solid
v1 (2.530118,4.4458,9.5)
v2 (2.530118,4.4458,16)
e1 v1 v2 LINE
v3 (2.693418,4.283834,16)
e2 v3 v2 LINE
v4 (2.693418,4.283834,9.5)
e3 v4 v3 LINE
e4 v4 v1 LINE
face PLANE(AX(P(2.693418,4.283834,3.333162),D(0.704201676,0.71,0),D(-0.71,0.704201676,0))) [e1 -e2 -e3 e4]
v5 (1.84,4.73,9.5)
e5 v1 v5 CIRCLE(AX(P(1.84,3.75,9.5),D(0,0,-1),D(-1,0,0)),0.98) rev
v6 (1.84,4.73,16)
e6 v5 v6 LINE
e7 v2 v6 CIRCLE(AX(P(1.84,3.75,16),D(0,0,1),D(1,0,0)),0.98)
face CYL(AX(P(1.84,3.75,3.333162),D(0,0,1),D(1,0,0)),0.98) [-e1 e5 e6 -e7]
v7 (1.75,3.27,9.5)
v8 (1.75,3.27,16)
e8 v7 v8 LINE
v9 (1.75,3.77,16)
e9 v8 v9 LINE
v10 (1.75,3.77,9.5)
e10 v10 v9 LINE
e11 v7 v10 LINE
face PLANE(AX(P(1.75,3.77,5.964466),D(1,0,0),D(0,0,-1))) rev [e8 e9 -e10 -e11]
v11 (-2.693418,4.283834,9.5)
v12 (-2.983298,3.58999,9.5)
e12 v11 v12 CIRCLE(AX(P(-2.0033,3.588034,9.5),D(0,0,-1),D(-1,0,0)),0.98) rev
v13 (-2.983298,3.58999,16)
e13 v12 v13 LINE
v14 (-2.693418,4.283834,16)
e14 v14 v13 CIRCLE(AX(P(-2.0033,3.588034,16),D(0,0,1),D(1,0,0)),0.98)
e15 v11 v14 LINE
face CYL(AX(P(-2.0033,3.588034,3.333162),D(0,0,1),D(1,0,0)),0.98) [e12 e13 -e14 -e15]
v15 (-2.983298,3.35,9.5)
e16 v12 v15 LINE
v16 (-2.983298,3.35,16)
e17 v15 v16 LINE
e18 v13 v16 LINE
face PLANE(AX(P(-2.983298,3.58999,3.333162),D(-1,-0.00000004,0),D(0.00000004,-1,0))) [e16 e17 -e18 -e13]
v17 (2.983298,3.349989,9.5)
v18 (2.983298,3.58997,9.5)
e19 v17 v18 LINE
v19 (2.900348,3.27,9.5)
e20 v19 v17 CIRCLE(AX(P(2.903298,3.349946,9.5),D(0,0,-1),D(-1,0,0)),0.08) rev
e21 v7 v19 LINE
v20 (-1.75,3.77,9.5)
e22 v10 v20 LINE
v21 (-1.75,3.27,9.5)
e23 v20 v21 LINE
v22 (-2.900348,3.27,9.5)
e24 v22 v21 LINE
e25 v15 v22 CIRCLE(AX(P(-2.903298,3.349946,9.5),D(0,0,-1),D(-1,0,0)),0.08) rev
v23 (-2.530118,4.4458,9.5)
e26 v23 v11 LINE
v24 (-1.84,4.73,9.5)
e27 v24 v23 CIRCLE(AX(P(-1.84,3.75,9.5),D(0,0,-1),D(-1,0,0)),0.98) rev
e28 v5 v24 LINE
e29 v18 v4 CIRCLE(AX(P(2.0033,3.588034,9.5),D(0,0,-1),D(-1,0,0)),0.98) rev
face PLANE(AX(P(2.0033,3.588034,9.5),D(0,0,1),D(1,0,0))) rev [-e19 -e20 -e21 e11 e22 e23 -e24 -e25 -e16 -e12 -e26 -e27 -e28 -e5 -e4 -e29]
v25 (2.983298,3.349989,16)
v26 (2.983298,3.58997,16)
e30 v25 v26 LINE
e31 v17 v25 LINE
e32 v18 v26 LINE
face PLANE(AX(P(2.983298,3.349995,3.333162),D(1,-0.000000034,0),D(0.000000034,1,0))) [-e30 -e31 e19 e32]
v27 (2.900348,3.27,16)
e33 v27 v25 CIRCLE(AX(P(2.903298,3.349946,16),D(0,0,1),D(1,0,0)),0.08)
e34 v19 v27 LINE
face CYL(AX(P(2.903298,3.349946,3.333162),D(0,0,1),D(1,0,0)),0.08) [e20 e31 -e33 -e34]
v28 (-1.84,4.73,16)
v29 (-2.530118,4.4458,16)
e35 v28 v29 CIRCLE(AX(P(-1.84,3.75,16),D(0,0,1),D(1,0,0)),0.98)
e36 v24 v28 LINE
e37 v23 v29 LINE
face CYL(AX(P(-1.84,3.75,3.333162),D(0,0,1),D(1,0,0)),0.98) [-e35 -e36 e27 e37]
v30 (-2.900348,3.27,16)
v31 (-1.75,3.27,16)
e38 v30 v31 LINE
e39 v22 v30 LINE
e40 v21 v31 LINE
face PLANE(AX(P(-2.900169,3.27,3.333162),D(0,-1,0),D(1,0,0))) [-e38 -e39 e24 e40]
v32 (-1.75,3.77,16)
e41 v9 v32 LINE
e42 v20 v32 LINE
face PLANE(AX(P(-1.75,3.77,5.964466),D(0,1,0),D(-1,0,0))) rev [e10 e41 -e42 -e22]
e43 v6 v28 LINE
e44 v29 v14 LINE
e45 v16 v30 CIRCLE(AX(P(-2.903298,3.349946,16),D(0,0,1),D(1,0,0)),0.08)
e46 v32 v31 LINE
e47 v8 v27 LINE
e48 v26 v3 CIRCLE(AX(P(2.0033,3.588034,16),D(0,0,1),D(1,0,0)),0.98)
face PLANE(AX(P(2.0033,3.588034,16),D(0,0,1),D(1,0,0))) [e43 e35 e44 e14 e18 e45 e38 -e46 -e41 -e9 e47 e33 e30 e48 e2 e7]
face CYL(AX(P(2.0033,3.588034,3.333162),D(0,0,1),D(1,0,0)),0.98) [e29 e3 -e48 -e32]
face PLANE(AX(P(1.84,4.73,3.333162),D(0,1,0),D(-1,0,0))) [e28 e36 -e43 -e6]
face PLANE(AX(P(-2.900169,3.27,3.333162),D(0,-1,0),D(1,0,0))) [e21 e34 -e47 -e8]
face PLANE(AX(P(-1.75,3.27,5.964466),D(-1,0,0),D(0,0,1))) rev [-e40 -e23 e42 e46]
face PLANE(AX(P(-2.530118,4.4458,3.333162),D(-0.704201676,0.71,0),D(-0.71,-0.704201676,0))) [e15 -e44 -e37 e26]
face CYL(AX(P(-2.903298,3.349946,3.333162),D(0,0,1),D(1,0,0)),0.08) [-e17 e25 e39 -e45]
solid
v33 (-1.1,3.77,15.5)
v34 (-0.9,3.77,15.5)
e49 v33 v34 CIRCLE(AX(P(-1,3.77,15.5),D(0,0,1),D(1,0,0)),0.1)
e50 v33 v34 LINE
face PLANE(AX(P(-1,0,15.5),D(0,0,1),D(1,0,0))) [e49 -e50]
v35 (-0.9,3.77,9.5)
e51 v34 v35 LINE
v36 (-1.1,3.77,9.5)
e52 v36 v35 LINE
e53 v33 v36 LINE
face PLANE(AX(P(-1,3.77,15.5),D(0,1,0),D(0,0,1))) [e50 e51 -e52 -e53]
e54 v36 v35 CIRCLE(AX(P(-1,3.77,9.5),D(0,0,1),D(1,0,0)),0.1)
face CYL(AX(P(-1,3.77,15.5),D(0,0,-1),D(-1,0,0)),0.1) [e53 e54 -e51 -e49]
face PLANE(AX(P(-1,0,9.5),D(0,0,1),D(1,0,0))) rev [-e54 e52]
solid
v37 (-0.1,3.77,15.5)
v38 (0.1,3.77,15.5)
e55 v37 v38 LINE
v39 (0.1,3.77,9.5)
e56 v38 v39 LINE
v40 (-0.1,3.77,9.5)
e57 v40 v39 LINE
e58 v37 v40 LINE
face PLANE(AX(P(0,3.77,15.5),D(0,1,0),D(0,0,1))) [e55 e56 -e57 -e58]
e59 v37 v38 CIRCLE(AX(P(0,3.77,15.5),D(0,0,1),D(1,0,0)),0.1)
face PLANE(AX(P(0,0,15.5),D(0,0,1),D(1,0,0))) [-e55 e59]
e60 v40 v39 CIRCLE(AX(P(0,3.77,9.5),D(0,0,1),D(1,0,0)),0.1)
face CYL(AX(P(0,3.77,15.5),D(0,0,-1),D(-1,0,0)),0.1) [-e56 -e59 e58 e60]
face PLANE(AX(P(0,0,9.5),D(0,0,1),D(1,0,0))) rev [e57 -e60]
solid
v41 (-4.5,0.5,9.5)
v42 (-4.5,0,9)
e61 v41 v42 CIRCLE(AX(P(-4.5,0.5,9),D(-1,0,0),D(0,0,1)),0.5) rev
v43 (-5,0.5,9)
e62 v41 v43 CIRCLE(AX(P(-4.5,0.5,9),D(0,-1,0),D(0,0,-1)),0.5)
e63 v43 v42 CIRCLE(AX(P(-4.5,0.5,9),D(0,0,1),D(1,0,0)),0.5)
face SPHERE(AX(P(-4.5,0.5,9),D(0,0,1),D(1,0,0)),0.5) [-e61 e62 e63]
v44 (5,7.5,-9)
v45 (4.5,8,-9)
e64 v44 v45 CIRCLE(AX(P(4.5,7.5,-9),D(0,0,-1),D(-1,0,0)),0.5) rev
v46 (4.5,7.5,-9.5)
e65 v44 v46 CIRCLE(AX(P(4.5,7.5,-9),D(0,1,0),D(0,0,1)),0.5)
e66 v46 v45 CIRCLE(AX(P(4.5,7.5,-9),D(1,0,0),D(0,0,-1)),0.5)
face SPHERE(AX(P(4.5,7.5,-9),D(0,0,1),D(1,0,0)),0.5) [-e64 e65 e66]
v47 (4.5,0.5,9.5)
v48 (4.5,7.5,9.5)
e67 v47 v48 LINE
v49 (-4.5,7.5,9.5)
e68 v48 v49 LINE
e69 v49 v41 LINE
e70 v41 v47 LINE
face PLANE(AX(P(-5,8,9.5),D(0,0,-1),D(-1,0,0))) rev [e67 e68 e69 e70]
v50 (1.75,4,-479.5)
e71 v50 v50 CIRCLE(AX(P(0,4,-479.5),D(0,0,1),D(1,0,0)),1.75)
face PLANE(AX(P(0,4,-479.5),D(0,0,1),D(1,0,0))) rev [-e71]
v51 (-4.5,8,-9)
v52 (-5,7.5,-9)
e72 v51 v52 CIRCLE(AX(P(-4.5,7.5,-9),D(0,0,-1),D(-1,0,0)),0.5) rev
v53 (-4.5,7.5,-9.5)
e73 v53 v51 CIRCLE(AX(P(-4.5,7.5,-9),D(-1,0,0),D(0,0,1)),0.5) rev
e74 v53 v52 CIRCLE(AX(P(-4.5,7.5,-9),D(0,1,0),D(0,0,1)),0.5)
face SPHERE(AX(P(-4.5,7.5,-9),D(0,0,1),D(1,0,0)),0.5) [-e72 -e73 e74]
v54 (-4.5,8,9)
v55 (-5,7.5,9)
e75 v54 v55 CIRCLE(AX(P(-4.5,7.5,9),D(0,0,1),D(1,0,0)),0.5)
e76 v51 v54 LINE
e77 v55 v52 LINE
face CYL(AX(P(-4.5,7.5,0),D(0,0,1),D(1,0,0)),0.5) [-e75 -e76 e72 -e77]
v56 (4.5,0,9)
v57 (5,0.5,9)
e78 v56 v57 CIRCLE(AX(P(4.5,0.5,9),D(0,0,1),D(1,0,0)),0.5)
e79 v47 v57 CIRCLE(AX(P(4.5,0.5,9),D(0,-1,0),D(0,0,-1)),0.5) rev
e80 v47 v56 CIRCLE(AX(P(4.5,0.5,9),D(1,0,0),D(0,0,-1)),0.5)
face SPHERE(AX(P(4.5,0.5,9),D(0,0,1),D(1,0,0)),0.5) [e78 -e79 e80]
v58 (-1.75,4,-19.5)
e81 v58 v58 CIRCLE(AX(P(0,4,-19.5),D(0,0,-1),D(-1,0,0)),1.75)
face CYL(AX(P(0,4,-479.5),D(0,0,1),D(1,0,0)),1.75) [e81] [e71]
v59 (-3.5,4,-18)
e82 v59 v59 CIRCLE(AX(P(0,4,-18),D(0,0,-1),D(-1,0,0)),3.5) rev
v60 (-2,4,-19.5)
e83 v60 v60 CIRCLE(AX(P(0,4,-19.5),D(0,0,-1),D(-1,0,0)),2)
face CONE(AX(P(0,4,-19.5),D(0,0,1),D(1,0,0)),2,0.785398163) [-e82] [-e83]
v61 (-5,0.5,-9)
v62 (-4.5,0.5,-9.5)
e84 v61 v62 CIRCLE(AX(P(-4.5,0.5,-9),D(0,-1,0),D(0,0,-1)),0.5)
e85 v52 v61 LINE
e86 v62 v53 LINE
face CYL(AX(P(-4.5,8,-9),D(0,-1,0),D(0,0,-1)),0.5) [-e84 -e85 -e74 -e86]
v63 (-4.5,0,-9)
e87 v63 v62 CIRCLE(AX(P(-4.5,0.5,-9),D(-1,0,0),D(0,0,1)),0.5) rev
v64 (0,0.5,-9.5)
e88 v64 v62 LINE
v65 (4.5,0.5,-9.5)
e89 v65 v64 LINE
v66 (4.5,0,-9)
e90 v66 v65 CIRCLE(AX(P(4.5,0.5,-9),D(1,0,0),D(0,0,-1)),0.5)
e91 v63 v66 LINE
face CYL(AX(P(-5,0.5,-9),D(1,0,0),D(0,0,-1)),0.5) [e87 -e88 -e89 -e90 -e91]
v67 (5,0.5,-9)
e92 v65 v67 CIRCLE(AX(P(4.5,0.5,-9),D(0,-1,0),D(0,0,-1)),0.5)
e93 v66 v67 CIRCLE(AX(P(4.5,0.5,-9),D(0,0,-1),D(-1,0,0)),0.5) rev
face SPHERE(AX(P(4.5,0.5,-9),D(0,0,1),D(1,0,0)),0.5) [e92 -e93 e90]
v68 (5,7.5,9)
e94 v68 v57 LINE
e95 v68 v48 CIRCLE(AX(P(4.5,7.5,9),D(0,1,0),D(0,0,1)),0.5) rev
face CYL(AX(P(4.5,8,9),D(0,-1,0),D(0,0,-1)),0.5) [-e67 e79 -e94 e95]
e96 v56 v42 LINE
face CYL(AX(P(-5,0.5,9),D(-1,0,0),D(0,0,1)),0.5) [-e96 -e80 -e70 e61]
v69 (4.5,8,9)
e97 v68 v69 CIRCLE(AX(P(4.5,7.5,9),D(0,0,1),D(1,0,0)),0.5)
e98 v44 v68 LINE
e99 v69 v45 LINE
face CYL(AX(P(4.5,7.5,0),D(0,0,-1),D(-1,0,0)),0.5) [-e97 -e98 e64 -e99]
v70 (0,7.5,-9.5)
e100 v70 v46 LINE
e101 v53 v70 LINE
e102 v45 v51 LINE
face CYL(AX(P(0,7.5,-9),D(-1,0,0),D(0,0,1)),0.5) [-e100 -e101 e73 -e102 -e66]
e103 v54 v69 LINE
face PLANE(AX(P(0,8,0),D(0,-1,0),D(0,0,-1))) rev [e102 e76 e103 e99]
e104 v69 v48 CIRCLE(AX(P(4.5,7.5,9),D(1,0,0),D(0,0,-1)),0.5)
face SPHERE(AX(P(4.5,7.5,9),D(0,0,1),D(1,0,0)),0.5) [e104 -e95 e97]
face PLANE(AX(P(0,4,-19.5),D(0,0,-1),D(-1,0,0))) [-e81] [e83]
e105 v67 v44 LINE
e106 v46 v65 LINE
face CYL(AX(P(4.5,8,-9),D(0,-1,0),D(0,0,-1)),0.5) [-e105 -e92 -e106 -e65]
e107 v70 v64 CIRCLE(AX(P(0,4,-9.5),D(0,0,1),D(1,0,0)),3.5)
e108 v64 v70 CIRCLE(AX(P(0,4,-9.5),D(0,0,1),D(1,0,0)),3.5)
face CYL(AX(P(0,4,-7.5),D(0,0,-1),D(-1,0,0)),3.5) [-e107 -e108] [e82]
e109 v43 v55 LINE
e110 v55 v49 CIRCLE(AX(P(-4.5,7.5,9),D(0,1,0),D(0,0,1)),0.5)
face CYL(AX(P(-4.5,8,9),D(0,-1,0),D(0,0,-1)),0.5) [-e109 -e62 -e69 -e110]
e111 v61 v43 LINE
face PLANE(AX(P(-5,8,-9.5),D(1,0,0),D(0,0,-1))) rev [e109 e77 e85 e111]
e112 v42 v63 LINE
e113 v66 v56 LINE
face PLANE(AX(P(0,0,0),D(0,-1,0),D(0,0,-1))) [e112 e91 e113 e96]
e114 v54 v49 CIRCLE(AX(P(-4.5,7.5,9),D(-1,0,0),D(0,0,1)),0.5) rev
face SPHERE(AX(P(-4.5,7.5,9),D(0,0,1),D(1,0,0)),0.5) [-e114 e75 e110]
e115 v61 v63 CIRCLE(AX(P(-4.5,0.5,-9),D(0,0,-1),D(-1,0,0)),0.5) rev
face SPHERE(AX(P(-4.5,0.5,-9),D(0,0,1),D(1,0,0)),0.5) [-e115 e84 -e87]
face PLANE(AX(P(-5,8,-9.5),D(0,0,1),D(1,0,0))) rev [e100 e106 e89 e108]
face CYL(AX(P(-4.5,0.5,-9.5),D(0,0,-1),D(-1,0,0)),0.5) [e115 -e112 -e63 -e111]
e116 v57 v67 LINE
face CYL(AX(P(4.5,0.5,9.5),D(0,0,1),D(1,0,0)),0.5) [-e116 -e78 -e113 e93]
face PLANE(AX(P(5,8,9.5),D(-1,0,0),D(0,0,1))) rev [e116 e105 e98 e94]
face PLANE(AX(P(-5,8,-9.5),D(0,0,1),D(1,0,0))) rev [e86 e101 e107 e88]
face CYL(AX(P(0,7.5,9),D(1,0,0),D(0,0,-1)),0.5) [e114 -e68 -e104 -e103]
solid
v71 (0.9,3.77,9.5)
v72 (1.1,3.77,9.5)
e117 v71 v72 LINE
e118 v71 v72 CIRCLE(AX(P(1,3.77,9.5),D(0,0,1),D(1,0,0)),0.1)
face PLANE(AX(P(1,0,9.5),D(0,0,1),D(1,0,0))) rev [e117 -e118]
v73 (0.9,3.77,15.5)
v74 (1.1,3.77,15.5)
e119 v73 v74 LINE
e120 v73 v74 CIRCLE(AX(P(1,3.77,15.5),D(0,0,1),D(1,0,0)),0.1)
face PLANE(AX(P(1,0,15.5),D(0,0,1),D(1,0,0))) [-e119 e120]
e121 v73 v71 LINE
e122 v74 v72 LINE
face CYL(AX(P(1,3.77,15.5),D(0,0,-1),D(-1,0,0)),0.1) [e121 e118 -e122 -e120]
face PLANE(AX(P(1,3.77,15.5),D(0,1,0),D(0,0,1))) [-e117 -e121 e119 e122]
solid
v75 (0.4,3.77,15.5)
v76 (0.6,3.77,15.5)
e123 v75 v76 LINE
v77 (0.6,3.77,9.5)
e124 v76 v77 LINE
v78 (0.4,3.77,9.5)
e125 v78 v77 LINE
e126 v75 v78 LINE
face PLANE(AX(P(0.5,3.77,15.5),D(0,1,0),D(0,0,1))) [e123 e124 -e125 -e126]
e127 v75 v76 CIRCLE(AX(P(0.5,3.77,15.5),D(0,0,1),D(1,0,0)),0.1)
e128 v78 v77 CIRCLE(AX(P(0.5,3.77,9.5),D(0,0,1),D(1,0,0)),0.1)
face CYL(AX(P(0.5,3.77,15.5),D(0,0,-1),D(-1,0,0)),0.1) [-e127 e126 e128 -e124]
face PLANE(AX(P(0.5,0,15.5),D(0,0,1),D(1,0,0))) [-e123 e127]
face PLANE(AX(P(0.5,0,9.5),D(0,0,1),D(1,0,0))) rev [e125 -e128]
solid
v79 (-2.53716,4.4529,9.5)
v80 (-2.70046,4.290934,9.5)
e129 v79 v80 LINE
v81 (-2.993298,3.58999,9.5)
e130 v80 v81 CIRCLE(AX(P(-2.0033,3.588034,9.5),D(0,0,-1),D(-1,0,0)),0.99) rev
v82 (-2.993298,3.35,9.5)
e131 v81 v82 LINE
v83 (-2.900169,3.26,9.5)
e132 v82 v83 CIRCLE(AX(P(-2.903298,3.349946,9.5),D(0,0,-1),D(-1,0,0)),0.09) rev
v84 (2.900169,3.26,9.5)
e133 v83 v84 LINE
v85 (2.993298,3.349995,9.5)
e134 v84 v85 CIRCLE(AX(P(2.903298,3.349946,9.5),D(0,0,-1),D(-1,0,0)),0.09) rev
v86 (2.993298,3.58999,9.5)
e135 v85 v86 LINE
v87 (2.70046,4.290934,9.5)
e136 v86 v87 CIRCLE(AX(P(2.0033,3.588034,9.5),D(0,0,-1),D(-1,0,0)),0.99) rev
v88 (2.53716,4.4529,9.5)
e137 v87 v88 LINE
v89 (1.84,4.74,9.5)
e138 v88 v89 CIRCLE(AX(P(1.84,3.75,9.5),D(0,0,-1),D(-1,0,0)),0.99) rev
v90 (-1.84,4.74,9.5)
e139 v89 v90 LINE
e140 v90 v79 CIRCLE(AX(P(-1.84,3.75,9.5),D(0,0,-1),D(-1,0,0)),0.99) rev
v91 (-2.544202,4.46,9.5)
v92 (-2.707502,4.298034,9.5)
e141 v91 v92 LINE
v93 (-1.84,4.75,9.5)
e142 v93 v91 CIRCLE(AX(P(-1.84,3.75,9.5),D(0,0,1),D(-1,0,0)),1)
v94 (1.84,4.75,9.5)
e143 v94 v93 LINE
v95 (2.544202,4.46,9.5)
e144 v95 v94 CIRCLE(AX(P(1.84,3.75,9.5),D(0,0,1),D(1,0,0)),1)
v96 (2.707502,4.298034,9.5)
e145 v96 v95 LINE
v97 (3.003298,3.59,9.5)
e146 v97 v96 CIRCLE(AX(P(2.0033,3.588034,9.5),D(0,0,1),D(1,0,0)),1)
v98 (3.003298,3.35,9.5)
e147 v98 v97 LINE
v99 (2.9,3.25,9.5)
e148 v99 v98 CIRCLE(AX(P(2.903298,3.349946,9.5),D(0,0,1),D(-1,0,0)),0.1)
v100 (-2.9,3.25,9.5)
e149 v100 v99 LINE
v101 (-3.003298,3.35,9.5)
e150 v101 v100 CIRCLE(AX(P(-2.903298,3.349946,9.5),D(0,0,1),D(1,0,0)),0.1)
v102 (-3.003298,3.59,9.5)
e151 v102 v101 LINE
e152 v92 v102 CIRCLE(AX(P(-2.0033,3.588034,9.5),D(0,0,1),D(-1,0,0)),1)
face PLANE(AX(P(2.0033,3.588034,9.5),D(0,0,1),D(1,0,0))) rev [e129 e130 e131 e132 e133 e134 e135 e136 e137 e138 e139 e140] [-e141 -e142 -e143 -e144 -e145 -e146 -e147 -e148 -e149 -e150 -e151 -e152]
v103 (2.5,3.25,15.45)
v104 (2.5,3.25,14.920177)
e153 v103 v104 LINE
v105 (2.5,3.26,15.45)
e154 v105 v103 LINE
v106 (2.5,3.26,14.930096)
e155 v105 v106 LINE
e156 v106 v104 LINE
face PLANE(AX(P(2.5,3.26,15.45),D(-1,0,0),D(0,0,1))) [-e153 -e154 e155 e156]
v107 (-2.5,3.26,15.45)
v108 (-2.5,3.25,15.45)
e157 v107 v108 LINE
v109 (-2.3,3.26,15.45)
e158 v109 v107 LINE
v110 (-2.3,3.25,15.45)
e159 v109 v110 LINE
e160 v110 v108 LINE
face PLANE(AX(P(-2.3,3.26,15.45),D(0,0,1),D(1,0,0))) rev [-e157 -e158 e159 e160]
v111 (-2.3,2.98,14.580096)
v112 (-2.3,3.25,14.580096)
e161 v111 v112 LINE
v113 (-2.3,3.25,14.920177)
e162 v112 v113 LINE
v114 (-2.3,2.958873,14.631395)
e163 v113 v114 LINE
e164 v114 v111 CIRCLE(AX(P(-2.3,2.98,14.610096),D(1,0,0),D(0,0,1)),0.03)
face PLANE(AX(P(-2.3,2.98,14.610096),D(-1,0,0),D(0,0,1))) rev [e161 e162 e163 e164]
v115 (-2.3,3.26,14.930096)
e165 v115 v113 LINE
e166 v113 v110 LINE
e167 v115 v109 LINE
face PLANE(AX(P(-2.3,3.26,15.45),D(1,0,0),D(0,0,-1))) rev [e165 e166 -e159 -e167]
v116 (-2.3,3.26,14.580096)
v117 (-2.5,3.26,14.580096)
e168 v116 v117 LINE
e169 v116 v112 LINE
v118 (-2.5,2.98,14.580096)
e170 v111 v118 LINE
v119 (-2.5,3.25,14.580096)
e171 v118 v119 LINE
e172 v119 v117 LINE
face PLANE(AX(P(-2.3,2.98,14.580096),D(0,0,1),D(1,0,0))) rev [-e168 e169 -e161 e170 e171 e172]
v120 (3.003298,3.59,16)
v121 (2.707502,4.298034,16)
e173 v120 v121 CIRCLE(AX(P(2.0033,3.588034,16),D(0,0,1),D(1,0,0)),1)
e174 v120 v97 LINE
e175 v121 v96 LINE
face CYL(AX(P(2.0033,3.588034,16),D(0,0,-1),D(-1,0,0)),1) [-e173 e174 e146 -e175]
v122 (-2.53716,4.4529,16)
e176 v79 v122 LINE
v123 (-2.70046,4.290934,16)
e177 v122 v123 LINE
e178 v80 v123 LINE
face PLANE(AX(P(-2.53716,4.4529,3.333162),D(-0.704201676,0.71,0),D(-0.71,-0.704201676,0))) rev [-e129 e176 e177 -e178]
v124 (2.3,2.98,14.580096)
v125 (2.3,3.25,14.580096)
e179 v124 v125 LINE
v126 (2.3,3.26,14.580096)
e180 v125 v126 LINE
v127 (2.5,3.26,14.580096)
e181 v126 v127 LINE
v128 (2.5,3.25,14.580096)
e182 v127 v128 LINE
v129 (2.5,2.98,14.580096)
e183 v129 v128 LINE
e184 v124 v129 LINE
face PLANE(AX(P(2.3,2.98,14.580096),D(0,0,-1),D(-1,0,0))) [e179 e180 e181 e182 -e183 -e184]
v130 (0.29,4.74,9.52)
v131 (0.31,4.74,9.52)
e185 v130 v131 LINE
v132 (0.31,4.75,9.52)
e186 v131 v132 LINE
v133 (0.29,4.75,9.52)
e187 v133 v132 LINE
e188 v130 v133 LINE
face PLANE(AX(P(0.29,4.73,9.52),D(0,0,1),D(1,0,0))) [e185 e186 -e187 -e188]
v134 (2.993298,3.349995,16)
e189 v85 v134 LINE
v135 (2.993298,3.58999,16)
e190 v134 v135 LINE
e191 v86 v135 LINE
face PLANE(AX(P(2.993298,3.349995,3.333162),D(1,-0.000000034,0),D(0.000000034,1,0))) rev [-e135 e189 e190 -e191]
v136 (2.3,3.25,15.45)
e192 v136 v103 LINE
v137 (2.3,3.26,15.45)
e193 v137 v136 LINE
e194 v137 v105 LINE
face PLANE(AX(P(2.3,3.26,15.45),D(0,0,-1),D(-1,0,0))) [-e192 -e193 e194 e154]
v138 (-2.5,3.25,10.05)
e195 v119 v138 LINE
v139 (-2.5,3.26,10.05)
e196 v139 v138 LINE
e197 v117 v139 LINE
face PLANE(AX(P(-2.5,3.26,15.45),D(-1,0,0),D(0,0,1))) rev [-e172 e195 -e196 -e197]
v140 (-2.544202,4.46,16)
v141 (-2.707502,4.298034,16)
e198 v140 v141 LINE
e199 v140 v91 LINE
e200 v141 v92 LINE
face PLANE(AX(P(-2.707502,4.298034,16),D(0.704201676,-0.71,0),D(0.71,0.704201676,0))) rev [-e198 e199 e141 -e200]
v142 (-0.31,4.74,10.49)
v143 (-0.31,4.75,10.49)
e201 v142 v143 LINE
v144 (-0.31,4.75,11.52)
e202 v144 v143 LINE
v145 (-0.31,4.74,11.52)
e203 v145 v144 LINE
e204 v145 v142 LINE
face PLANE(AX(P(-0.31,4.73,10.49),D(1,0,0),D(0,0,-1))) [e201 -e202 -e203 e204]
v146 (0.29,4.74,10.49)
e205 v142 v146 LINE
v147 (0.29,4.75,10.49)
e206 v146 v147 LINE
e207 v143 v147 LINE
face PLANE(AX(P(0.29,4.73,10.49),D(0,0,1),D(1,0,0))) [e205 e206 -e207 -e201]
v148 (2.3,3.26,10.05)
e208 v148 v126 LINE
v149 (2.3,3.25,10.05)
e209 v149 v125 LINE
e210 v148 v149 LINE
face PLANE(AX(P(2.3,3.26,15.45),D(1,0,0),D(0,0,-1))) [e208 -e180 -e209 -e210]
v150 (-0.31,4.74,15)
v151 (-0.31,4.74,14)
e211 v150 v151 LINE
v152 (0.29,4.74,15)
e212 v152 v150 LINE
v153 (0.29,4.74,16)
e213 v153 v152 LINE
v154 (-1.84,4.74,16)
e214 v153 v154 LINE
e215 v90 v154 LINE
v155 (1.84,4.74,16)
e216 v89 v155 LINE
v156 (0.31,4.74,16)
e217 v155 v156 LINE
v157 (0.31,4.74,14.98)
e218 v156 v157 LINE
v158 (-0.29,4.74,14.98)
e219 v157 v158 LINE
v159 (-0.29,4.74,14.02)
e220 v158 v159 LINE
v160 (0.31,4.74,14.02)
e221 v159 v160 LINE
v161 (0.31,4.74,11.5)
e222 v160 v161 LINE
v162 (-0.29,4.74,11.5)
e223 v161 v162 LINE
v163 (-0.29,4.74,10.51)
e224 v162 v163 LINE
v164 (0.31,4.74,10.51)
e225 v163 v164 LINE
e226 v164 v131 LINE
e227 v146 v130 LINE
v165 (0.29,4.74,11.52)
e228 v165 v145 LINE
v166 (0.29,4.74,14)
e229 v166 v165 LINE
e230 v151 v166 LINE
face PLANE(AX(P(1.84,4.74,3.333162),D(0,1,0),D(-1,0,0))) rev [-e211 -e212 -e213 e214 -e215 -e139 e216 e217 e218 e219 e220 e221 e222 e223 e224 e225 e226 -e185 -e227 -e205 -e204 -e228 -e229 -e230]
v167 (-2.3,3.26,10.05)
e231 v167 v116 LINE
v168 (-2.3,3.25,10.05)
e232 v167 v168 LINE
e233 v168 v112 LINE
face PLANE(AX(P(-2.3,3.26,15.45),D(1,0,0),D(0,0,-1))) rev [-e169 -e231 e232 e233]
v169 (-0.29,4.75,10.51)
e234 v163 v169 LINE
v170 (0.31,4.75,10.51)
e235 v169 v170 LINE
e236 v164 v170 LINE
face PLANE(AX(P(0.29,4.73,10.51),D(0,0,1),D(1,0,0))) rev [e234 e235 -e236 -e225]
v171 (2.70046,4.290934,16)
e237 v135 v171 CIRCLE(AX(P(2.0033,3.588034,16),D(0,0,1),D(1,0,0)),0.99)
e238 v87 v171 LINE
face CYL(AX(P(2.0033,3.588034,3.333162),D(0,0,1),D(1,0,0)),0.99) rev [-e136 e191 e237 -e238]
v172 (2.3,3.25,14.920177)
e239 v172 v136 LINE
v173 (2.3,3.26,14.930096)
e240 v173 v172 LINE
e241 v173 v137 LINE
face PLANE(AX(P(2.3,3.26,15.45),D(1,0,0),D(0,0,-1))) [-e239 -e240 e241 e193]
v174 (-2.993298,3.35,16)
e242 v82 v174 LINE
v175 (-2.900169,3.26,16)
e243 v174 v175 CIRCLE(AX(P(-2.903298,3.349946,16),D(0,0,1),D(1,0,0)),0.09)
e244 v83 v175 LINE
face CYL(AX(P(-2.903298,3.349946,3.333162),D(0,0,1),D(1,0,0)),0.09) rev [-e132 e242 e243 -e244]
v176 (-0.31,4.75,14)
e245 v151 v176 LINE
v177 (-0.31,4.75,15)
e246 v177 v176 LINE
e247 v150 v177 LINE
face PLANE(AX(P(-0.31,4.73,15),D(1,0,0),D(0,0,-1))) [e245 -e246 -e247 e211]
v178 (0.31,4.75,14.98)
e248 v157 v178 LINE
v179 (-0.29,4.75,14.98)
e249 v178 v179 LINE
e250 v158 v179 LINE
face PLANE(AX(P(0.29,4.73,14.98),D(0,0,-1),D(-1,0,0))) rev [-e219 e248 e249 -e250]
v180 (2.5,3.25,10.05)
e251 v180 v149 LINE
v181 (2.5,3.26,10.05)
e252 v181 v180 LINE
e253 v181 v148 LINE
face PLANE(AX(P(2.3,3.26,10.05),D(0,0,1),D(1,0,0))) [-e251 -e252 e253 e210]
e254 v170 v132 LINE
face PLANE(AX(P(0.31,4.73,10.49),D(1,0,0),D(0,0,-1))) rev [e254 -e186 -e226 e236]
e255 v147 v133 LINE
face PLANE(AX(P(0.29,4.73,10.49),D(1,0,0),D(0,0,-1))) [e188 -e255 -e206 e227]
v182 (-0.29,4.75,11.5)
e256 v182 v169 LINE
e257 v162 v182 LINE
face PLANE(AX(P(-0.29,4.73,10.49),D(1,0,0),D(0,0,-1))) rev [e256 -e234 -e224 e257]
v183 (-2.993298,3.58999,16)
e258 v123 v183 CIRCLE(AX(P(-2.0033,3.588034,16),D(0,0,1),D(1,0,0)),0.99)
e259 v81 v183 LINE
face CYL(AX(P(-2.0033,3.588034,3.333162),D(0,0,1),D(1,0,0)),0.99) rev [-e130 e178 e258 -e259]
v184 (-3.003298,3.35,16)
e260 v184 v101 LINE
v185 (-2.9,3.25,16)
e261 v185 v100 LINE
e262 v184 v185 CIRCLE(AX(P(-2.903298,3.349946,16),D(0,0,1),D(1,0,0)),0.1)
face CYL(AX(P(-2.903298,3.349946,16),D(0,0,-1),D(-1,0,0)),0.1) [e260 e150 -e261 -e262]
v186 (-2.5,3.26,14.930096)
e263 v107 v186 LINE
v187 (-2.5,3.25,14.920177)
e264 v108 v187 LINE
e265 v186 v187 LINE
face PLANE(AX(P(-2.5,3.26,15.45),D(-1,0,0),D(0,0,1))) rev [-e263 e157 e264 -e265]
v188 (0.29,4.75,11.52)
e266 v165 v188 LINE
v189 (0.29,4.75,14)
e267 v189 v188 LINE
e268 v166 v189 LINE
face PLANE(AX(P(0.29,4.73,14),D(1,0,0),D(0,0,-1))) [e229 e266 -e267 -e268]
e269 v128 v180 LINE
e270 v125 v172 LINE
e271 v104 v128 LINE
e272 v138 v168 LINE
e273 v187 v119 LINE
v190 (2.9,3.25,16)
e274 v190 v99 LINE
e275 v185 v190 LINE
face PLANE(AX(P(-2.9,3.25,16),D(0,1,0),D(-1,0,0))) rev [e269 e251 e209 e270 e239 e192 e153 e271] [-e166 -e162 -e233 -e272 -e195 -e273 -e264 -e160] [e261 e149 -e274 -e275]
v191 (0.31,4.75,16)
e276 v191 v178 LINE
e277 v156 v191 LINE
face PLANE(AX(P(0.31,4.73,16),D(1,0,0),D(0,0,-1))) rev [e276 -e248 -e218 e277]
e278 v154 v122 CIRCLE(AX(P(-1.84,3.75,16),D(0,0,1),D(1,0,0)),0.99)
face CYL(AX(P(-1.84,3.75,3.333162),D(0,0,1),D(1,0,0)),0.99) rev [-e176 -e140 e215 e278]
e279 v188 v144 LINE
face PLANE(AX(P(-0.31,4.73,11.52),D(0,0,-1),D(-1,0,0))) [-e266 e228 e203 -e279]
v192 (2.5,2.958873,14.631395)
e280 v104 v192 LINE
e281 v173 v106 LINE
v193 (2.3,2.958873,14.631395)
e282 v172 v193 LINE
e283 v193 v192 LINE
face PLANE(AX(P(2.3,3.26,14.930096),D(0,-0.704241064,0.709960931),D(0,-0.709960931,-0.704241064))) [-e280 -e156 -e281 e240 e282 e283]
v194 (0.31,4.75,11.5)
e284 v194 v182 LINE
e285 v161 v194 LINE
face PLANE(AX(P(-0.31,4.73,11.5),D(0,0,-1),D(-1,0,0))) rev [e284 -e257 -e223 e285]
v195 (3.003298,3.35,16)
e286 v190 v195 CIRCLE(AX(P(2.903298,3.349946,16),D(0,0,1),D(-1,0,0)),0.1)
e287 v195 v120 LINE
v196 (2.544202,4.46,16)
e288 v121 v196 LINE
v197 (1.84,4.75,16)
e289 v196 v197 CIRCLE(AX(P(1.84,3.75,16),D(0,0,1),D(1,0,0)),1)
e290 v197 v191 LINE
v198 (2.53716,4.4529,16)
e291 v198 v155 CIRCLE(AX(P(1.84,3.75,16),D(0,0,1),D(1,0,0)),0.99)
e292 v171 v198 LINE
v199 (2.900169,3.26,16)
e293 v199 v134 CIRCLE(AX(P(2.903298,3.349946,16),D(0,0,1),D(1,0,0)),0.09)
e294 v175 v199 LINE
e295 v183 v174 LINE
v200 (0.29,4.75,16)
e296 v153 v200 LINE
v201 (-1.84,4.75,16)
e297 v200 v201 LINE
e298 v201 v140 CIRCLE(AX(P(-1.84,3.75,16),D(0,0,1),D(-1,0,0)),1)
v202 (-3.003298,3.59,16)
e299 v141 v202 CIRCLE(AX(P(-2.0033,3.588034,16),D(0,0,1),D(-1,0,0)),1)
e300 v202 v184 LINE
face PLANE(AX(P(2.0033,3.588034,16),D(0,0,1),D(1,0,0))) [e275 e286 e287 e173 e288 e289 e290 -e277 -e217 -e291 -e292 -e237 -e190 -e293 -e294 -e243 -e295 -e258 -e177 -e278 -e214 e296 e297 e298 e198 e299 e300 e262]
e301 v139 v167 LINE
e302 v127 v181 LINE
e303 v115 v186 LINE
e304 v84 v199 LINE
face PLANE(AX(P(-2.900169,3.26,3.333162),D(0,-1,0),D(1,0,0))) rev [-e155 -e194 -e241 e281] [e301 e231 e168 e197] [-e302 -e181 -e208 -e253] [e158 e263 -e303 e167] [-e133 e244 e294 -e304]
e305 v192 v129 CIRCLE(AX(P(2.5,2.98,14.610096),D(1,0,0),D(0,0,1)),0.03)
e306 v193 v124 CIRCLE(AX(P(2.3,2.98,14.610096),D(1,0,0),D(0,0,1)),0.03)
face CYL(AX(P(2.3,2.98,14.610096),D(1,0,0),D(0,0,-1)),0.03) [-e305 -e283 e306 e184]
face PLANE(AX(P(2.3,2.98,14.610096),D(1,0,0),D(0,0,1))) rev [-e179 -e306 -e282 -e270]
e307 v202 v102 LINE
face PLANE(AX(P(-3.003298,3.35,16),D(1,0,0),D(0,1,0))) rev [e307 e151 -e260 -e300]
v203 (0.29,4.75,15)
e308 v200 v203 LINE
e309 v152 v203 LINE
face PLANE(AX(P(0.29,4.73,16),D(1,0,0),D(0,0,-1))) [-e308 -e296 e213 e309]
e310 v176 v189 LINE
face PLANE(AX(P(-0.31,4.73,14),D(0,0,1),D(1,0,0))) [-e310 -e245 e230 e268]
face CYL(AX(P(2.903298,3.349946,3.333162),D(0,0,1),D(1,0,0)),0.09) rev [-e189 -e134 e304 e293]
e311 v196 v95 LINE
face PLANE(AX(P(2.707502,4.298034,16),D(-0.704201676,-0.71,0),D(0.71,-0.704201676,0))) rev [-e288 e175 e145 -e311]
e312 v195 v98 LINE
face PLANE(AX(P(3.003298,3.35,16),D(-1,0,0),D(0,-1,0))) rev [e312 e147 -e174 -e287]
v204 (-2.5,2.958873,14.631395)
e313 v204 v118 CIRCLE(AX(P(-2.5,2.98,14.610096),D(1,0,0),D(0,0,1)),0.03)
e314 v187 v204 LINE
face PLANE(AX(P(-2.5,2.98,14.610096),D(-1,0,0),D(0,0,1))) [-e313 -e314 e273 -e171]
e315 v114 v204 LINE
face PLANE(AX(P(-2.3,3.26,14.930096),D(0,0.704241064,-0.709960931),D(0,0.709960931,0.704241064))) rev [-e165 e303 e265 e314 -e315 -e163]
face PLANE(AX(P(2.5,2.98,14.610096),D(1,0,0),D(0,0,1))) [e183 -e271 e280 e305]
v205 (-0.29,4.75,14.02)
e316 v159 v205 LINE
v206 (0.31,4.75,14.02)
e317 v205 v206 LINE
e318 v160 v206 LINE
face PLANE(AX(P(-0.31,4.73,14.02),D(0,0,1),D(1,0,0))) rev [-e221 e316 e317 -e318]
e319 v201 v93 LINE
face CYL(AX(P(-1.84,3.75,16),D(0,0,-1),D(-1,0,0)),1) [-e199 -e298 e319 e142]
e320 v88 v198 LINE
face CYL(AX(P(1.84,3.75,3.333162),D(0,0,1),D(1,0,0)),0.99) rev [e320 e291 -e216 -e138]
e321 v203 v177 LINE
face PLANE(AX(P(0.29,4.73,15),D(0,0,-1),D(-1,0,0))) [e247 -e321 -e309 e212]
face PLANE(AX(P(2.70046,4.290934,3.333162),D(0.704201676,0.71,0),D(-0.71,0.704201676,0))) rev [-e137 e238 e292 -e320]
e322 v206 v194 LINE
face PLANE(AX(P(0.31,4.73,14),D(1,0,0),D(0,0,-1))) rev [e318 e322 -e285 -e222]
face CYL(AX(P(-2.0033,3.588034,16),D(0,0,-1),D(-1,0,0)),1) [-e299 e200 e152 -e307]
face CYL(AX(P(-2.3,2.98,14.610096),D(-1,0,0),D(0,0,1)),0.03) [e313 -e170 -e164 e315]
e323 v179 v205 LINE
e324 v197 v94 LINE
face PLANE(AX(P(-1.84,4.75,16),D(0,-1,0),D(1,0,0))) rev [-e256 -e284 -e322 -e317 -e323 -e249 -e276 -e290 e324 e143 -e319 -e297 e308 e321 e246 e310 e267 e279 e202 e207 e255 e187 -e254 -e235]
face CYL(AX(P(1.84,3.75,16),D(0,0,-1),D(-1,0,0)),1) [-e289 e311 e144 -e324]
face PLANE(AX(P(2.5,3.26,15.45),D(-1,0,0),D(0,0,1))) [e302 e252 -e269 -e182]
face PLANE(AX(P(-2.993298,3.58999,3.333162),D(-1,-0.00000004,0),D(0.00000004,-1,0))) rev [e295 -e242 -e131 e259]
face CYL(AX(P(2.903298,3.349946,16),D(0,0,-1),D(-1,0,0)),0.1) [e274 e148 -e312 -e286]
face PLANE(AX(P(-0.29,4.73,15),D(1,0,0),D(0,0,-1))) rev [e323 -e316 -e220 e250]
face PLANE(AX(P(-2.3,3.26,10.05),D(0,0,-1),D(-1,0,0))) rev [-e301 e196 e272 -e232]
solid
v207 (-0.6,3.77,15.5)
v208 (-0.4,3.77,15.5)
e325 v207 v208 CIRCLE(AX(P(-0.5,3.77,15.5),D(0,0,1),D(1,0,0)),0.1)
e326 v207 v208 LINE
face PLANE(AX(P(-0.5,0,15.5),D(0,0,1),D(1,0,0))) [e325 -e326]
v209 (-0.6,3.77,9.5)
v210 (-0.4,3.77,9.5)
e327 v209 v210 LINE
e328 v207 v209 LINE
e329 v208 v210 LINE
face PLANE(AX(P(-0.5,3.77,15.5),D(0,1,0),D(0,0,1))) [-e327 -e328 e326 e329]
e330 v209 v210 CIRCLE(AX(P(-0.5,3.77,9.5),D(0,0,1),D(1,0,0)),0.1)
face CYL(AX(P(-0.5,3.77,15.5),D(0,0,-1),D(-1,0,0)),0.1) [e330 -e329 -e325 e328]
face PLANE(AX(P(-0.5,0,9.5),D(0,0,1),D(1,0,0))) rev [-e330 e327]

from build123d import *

# Parameters (mm, degrees)
SKETCH1_W                             = 10
SKETCH1_H                             = 19
MAIN_BODY_DEPTH                       = 8
WIRE_ENCAPSULATE_DEPTH                = 10
WIRE_ENCAPSULATE_DEPTH_BACK           = 2
SKETCH2_R                             = 3.5
WIRE_START_SIZE                       = 1.5
MUSB_CONNECTOR_PROFILE_EXTERNAL_DEPTH = 6.5
MUSB_CONNECTOR_PROFILE_INTERNAL_DEPTH = 6.5
SKETCH9_W                             = 3.5
SKETCH9_H                             = 0.5
PIN_ACCESS_DEPTH                      = 6.5
CONTACT_PIN_DEPTH                     = 6
CP_L_COUNT                            = 3
CP_L_PITCH                            = 0.5
CP_L_COL_COUNT                        = 3
CP_L_COL_PITCH                        = 0.5
SHEET_METAL_BOTTOM_MERGE_DEPTH        = 0.02
SKETCH27_W                            = 0.2
SKETCH27_H                            = 5.4
TAB_CUTOUT_DEPTH                      = 0.01
LOCKING_TAB_DEPTH                     = 0.2
WIRE_START                            = -479.5
WIRE_2_OUTLINE_R                      = 1.75
WIRE_2_DEPTH                          = 460
MB_F_R                                = 0.5


# Read off the part's stored shape, not the designer's step: WIRE
with BuildPart() as part:
    # Sketch1 → MAIN BODY (new body)
    with BuildSketch(Plane(origin=(0, 0, 0), x_dir=(1, 0, 0), z_dir=(0, 1, 0))):
        Rectangle(SKETCH1_W, SKETCH1_H)
    extrude(amount=MAIN_BODY_DEPTH)

    # Sketch2 → WIRE ENCAPSULATE (add, two sides: drawn at the far end of the back side and taken through both)
    with BuildSketch(Plane(origin=(0, 0, -9.5), x_dir=(-1, 0, 0), z_dir=(0, 0, -1)).offset(-WIRE_ENCAPSULATE_DEPTH_BACK)):
        with Locations((0, 4)):
            Circle(SKETCH2_R)
    extrude(amount=WIRE_ENCAPSULATE_DEPTH + WIRE_ENCAPSULATE_DEPTH_BACK)

    # WIRE START
    wire_start_edges = [part.edges().sort_by_distance(p)[0] for p in [
        (3.5, 4, -19.5),
    ]]
    chamfer(wire_start_edges, length=WIRE_START_SIZE)

    # WIRE 2 outline → WIRE 2 (add)
    with BuildSketch(Plane.XY.offset(WIRE_START)):
        with Locations((0, 4)):
            Circle(WIRE_2_OUTLINE_R)
    extrude(amount=WIRE_2_DEPTH)

    # MB F
    mb_f_edges = [part.edges().sort_by_distance(p)[0] for p in [
        (-5, 8, 0),
        (0, 8, 9.5),
        (5, 8, 0),
        (0, 0, 9.5),
        (-5, 0, 0),
        (0, 0, -9.5),
        (5, 0, 0),
        (0, 8, -9.5),
        (5, 4, 9.5),
        (-5, 4, 9.5),
        (-5, 4, -9.5),
        (5, 4, -9.5),
    ]]
    fillet(mb_f_edges, radius=MB_F_R - 0.0001)  # a hair under: the kernel refuses the full size


with BuildPart() as body_2:
    # Sketch6 → MUSB CONNECTOR PROFILE EXTERNAL (new body)
    with BuildSketch(Plane.XY.offset(9.5)):
        with BuildLine():
            Line((3.003298067, 3.35), (3.003298067, 3.59))
            ThreePointArc((3.003298067, 3.59), (2.926014523, 3.973517609), (2.707501676, 4.298033615))
            Line((2.707501676, 4.298033615), (2.544201676, 4.46))
            ThreePointArc((2.544201676, 4.46), (2.220788655, 4.6746621), (1.84, 4.75))
            Line((1.84, 4.75), (-1.84, 4.75))
            ThreePointArc((-1.84, 4.75), (-2.220788655, 4.6746621), (-2.544201676, 4.46))
            Line((-2.544201676, 4.46), (-2.707501676, 4.298033615))
            ThreePointArc((-2.707501676, 4.298033615), (-2.926014523, 3.973517609), (-3.003298067, 3.59))
            Line((-3.003298067, 3.59), (-3.003298067, 3.35))
            ThreePointArc((-3.003298067, 3.35), (-2.972852481, 3.278097248), (-2.9, 3.25))
            Line((-2.9, 3.25), (2.9, 3.25))
            ThreePointArc((2.9, 3.25), (2.972852481, 3.278097248), (3.003298067, 3.35))
        make_face()
    extrude(amount=MUSB_CONNECTOR_PROFILE_EXTERNAL_DEPTH)

    # Sketch7 → MUSB CONNECTOR PROFILE INTERNAL (cut)
    with BuildSketch(Plane.XY.offset(16)):
        with BuildLine():
            Line((2.700459659, 4.290933615), (2.537159659, 4.4529))
            ThreePointArc((2.537159659, 4.4529), (2.216980769, 4.665415479), (1.84, 4.74))
            Line((1.84, 4.74), (-1.84, 4.74))
            ThreePointArc((-1.84, 4.74), (-2.216980769, 4.665415479), (-2.537159659, 4.4529))
            Line((-2.537159659, 4.4529), (-2.700459659, 4.290933615))
            ThreePointArc((-2.700459659, 4.290933615), (-2.916785483, 3.969667304), (-2.993298076, 3.589990168))
            Line((-2.993298076, 3.589990168), (-2.993298067, 3.35))
            ThreePointArc((-2.993298067, 3.35), (-2.965841277, 3.285228144), (-2.900169294, 3.26))
            Line((-2.900169294, 3.26), (2.900169294, 3.26))
            ThreePointArc((2.900169294, 3.26), (2.96583932, 3.285226254), (2.993298068, 3.34999456))
            Line((2.993298068, 3.34999456), (2.993298076, 3.589990168))
            ThreePointArc((2.993298076, 3.589990168), (2.916785492, 3.969667308), (2.700459659, 4.290933615))
        make_face()
        with BuildLine():
            Line((2.693417642, 4.283833615), (2.530117642, 4.4458))
            ThreePointArc((2.530117642, 4.4458), (2.213172882, 4.656168858), (1.84, 4.73))
            Line((1.84, 4.73), (-1.84, 4.73))
            ThreePointArc((-1.84, 4.73), (-2.213172882, 4.656168858), (-2.530117642, 4.4458))
            Line((-2.530117642, 4.4458), (-2.693417642, 4.283833615))
            ThreePointArc((-2.693417642, 4.283833615), (-2.907556457, 3.965816966), (-2.983298076, 3.589980261))
            Line((-2.983298076, 3.589980261), (-2.983298067, 3.349996889))
            ThreePointArc((-2.983298067, 3.349996889), (-2.958832383, 3.292361385), (-2.900348288, 3.27))
            Line((-2.900348288, 3.27), (2.900348288, 3.27))
            ThreePointArc((2.900348288, 3.27), (2.958830536, 3.292359606), (2.983298068, 3.34999176))
            Line((2.983298068, 3.34999176), (2.983298076, 3.589980262))
            ThreePointArc((2.983298076, 3.589980262), (2.907556466, 3.965816969), (2.693417642, 4.283833614))
        make_face(mode=Mode.SUBTRACT)
    extrude(amount=-MUSB_CONNECTOR_PROFILE_INTERNAL_DEPTH, mode=Mode.SUBTRACT)


with BuildPart() as musb_connector_profile_internal_piece_1:
    # of the separate pieces the step leaves, piece 1, a body of its own (musb_connector_profile_internal_pieces)
    add(body_2.part.solids().sort_by_distance((2.983298068, 3.34999176, 9.5))[0])

    # Sketch9 → PIN ACCESS (cut)
    with BuildSketch(Plane.XY.offset(16)):
        with Locations((0, 3.52)):
            Rectangle(SKETCH9_W, SKETCH9_H)
    extrude(amount=-PIN_ACCESS_DEPTH, mode=Mode.SUBTRACT)


with BuildPart() as musb_connector_profile_internal_piece_2:
    # of the separate pieces the step leaves, piece 2, a body of its own (musb_connector_profile_internal_pieces)
    add(body_2.part.solids().sort_by_distance((3.003298067, 3.35, 9.5))[0])

    # Sketch26 → SHEET METAL BOTTOM MERGE (cut)
    with BuildSketch(Plane(origin=(0, 4.75, 0), x_dir=(1, 0, 0), z_dir=(0, 1, 0))):
        Polygon((0.29, -16), (0.29, -15), (-0.31, -15), (-0.31, -14), (0.29, -14), (0.29, -11.52), (-0.31, -11.52), (-0.31, -10.49), (0.29, -10.49), (0.29, -9.52), (0.31, -9.52), (0.31, -10.51), (-0.29, -10.51), (-0.29, -11.5), (0.31, -11.5), (0.31, -14.02), (-0.29, -14.02), (-0.29, -14.98), (0.31, -14.98), (0.31, -16), align=None)
    extrude(amount=-SHEET_METAL_BOTTOM_MERGE_DEPTH, mode=Mode.SUBTRACT)

    # Sketch27 → TAB CUTOUT (cut)
    with BuildSketch(Plane.XZ.offset(-3.25)):
        with Locations((-2.4, 12.75)):
            Rectangle(SKETCH27_W, SKETCH27_H)
    tab_cutout = extrude(amount=-TAB_CUTOUT_DEPTH, mode=Mode.SUBTRACT)

    # Sketch28 → LOCKING TAB (add)
    with BuildSketch(Plane(origin=(-2.5, 0, 0), x_dir=(0, 0, -1), z_dir=(1, 0, 0))):
        with BuildLine():
            Line((-14.930096163, 3.26), (-14.631394991, 2.958872768))
            ThreePointArc((-14.631394991, 2.958872768), (-14.598671734, 2.952260454), (-14.580096163, 2.98))
            Line((-14.580096163, 2.98), (-14.580096163, 3.26))
            Line((-14.580096163, 3.26), (-14.930096163, 3.26))
        make_face()
    locking_tab = extrude(amount=LOCKING_TAB_DEPTH)

    # Mirror1: TAB CUTOUT, LOCKING TAB across plane
    add(tab_cutout.mirror(Plane(origin=(0, 0, 0), x_dir=(0, 0, 1), z_dir=(1, 0, 0))), mode=Mode.SUBTRACT)
    add(locking_tab.mirror(Plane(origin=(0, 0, 0), x_dir=(0, 0, 1), z_dir=(1, 0, 0))))


with BuildPart() as body_4:
    # Sketch10 → CONTACT PIN (new body)
    with BuildSketch(Plane.XY.offset(9.5)):
        with BuildLine():
            Line((-0.1, 3.77), (0.1, 3.77))
            ThreePointArc((0.1, 3.77), (0, 3.67), (-0.1, 3.77))
        make_face()
    contact_pin = extrude(amount=CONTACT_PIN_DEPTH)


with BuildPart() as cp_l_1:
    # CP L: CONTACT PIN ×3
    with Locations(*[(-i * CP_L_PITCH, 0, 0) for i in range(1, CP_L_COUNT)]):
        add(contact_pin)


with BuildPart() as cp_l_col_1:
    # CP L col: CONTACT PIN ×3
    with Locations(*[(i * CP_L_COL_PITCH, 0, 0) for i in range(1, CP_L_COL_COUNT)]):
        add(contact_pin)


solid = Compound([part.part, musb_connector_profile_internal_piece_1.part, musb_connector_profile_internal_piece_2.part, body_4.part, cp_l_1.part, cp_l_col_1.part])
